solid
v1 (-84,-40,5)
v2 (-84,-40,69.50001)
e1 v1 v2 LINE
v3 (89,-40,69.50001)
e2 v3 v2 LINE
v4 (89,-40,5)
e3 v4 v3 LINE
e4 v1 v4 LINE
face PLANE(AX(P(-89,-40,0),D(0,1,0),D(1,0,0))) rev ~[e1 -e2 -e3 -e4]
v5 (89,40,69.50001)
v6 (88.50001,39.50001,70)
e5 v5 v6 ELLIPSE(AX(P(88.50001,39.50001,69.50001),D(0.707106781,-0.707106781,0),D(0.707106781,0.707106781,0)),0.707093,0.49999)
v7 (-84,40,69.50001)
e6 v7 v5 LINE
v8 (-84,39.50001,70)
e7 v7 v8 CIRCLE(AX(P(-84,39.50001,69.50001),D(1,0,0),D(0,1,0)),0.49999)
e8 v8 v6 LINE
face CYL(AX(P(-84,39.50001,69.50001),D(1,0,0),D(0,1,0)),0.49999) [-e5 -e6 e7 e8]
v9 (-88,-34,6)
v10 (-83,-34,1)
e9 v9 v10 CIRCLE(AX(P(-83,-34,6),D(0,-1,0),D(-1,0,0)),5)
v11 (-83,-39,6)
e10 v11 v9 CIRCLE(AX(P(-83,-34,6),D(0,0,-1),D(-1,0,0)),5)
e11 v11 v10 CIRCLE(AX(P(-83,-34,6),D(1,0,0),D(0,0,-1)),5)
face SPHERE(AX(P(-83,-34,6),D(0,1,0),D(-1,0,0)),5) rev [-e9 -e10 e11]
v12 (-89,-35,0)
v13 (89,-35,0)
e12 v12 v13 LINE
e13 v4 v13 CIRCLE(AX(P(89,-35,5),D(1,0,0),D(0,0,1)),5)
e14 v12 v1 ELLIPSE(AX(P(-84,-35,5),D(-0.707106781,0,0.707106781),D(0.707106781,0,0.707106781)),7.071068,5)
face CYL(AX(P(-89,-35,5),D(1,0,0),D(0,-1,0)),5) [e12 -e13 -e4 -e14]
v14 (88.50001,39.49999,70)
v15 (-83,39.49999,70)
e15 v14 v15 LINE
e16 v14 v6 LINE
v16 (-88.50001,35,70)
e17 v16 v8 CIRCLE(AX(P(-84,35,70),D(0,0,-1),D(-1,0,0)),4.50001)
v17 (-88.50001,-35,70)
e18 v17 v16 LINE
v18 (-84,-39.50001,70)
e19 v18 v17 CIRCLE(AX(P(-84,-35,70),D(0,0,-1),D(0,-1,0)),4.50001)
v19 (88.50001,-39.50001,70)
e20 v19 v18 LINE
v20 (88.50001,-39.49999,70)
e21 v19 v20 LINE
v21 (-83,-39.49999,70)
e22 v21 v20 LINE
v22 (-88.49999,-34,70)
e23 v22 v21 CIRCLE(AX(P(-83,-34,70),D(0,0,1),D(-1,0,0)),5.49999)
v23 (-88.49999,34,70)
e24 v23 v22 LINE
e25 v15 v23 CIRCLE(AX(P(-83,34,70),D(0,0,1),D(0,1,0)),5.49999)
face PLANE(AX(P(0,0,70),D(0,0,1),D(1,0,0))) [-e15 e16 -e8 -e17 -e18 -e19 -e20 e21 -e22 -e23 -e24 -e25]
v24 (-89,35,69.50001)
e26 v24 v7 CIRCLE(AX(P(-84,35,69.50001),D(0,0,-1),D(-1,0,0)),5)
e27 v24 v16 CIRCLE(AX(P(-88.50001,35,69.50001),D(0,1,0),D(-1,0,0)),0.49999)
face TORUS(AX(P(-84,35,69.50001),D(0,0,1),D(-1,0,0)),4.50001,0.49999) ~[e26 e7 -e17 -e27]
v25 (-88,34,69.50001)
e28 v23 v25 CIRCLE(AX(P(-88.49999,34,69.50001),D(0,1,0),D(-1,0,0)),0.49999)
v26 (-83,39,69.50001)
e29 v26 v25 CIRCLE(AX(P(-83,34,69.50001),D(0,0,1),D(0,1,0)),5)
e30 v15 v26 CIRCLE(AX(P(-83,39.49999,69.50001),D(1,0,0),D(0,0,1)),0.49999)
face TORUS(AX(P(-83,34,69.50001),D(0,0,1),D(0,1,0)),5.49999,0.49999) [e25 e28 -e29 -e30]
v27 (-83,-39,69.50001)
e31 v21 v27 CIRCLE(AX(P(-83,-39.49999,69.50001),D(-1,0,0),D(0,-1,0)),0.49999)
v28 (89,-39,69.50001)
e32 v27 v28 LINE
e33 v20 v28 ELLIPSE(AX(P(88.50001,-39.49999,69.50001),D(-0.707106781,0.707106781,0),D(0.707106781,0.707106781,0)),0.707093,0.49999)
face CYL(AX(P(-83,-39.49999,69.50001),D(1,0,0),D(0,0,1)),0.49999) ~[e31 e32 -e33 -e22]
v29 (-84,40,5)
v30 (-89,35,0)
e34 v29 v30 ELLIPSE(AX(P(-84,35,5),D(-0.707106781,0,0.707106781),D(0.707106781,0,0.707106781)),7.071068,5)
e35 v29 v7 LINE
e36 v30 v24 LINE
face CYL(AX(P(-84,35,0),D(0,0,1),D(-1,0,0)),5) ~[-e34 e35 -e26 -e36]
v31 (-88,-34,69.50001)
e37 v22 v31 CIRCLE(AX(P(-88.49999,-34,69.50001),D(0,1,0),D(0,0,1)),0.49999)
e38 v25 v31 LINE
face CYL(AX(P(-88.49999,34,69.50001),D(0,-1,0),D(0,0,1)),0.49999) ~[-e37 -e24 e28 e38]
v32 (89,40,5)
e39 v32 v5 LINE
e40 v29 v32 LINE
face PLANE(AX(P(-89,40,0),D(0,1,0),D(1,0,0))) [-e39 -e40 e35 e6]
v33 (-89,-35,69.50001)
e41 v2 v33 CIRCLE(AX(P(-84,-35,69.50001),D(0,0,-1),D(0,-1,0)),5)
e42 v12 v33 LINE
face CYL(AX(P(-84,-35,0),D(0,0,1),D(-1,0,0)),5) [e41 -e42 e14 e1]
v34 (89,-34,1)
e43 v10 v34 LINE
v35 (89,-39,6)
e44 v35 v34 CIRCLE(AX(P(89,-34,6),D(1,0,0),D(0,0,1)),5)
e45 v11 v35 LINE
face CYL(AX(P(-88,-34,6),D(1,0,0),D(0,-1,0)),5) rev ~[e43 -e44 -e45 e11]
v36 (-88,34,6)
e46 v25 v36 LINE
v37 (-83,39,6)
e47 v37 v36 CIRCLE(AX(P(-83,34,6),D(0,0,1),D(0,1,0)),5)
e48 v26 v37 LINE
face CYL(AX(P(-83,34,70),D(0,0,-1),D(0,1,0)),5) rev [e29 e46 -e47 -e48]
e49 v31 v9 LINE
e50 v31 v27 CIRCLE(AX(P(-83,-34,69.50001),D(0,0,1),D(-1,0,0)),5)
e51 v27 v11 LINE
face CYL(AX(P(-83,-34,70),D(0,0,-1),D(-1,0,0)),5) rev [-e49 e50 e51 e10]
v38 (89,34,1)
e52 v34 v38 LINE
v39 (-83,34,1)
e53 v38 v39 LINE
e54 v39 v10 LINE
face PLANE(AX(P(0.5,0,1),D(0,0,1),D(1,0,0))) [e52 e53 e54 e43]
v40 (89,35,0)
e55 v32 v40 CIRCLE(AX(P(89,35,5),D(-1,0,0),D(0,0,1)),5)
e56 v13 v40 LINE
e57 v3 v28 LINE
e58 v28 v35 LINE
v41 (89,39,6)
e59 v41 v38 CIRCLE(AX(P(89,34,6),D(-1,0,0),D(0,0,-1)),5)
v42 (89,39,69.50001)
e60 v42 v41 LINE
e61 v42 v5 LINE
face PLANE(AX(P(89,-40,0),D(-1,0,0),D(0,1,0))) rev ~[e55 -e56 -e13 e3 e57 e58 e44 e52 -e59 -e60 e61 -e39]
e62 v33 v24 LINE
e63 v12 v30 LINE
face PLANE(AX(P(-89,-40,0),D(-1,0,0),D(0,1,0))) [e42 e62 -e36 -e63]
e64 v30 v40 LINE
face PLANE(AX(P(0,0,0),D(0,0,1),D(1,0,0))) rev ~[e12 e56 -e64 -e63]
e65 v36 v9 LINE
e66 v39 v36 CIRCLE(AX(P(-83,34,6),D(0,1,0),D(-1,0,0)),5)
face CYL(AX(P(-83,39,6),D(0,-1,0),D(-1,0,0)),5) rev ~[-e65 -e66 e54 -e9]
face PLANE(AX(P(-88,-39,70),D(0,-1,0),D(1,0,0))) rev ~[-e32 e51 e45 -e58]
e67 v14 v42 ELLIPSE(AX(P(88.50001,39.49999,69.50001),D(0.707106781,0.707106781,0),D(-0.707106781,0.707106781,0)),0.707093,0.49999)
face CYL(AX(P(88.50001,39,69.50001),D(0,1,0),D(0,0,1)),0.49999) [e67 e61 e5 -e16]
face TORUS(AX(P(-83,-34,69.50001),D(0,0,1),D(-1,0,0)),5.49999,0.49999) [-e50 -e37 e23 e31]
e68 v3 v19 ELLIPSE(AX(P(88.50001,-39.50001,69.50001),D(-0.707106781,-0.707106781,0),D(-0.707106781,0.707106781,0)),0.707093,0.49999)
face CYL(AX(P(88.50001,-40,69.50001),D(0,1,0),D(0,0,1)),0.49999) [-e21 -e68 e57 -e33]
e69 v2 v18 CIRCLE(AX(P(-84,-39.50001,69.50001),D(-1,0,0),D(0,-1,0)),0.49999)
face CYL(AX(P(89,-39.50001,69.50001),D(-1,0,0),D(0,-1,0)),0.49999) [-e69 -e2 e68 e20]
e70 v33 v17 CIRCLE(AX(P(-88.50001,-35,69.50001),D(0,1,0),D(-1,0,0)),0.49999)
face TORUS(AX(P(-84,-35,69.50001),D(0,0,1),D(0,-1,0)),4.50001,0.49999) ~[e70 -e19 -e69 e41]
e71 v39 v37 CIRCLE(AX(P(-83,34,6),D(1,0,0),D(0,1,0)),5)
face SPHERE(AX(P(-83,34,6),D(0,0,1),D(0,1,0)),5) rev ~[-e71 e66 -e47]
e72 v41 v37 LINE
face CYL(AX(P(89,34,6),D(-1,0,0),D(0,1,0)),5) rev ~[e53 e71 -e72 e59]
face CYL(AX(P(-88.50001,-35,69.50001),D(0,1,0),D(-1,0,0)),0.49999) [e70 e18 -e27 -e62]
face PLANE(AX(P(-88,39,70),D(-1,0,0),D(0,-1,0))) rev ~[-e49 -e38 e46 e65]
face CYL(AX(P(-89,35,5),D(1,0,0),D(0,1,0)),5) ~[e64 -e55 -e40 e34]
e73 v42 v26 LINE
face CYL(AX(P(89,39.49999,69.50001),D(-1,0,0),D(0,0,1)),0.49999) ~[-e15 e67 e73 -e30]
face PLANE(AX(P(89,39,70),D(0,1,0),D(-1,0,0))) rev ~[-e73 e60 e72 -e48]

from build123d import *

# Parameters (mm, degrees)
F0_W     = 178
F0_H     = 80
F1_DEPTH = 70
F3_DEPTH = 69
F4_R     = 5
F5_R     = 0.49999


# Not quite as in the source:
# - a fillet or chamfer is up to 0.001 mm smaller than in the source, because OpenCascade refuses the exact size


with BuildPart() as f1:
    # F0 (on Top) → F1 (new body)
    with BuildSketch(Plane.XY):
        Rectangle(F0_W, F0_H)
    extrude(amount=F1_DEPTH)

    # F2 (on face) → F3 (cut)
    with BuildSketch(Plane.XY.offset(70)):
        Polygon((-88, -24.0239519626), (-88, -39), (-83.0030292273, -39), (89, -39), (89, 39), (-88, 39), align=None)
    extrude(amount=-F3_DEPTH, mode=Mode.SUBTRACT)

    # F4
    f4_edges = [f1.edges().sort_by_distance(p)[0] for p in [
        (-88, 39, 35.5),
        (0.5, 39, 1),
        (-88, 0, 1),
        (-88, -39, 35.5),
        (0.5, -39, 1),
        (0, 40, 0),
        (-89, 40, 35),
        (-89, -40, 35),
        (0, -40, 0),
    ]]
    fillet(f4_edges, radius=F4_R)

    # F5 (radius 0.5 in the source; OpenCascade refuses exactly that, so slightly less here)
    f5_edges = [f1.edges().sort_by_distance(p)[0] for p in [
        (-89, 0, 70),
        (-87.535534, 38.535534, 70),
        (-87.535534, -38.535534, 70),
        (2.5, 40, 70),
        (2.5, -40, 70),
        (89, 39.5, 70),
        (89, -39.5, 70),
        (3, 39, 70),
        (3, -39, 70),
        (-86.535534, 37.535534, 70),
        (-86.535534, -37.535534, 70),
        (-88, 0, 70),
    ]]
    fillet(f5_edges, radius=F5_R)


solid = f1.part
